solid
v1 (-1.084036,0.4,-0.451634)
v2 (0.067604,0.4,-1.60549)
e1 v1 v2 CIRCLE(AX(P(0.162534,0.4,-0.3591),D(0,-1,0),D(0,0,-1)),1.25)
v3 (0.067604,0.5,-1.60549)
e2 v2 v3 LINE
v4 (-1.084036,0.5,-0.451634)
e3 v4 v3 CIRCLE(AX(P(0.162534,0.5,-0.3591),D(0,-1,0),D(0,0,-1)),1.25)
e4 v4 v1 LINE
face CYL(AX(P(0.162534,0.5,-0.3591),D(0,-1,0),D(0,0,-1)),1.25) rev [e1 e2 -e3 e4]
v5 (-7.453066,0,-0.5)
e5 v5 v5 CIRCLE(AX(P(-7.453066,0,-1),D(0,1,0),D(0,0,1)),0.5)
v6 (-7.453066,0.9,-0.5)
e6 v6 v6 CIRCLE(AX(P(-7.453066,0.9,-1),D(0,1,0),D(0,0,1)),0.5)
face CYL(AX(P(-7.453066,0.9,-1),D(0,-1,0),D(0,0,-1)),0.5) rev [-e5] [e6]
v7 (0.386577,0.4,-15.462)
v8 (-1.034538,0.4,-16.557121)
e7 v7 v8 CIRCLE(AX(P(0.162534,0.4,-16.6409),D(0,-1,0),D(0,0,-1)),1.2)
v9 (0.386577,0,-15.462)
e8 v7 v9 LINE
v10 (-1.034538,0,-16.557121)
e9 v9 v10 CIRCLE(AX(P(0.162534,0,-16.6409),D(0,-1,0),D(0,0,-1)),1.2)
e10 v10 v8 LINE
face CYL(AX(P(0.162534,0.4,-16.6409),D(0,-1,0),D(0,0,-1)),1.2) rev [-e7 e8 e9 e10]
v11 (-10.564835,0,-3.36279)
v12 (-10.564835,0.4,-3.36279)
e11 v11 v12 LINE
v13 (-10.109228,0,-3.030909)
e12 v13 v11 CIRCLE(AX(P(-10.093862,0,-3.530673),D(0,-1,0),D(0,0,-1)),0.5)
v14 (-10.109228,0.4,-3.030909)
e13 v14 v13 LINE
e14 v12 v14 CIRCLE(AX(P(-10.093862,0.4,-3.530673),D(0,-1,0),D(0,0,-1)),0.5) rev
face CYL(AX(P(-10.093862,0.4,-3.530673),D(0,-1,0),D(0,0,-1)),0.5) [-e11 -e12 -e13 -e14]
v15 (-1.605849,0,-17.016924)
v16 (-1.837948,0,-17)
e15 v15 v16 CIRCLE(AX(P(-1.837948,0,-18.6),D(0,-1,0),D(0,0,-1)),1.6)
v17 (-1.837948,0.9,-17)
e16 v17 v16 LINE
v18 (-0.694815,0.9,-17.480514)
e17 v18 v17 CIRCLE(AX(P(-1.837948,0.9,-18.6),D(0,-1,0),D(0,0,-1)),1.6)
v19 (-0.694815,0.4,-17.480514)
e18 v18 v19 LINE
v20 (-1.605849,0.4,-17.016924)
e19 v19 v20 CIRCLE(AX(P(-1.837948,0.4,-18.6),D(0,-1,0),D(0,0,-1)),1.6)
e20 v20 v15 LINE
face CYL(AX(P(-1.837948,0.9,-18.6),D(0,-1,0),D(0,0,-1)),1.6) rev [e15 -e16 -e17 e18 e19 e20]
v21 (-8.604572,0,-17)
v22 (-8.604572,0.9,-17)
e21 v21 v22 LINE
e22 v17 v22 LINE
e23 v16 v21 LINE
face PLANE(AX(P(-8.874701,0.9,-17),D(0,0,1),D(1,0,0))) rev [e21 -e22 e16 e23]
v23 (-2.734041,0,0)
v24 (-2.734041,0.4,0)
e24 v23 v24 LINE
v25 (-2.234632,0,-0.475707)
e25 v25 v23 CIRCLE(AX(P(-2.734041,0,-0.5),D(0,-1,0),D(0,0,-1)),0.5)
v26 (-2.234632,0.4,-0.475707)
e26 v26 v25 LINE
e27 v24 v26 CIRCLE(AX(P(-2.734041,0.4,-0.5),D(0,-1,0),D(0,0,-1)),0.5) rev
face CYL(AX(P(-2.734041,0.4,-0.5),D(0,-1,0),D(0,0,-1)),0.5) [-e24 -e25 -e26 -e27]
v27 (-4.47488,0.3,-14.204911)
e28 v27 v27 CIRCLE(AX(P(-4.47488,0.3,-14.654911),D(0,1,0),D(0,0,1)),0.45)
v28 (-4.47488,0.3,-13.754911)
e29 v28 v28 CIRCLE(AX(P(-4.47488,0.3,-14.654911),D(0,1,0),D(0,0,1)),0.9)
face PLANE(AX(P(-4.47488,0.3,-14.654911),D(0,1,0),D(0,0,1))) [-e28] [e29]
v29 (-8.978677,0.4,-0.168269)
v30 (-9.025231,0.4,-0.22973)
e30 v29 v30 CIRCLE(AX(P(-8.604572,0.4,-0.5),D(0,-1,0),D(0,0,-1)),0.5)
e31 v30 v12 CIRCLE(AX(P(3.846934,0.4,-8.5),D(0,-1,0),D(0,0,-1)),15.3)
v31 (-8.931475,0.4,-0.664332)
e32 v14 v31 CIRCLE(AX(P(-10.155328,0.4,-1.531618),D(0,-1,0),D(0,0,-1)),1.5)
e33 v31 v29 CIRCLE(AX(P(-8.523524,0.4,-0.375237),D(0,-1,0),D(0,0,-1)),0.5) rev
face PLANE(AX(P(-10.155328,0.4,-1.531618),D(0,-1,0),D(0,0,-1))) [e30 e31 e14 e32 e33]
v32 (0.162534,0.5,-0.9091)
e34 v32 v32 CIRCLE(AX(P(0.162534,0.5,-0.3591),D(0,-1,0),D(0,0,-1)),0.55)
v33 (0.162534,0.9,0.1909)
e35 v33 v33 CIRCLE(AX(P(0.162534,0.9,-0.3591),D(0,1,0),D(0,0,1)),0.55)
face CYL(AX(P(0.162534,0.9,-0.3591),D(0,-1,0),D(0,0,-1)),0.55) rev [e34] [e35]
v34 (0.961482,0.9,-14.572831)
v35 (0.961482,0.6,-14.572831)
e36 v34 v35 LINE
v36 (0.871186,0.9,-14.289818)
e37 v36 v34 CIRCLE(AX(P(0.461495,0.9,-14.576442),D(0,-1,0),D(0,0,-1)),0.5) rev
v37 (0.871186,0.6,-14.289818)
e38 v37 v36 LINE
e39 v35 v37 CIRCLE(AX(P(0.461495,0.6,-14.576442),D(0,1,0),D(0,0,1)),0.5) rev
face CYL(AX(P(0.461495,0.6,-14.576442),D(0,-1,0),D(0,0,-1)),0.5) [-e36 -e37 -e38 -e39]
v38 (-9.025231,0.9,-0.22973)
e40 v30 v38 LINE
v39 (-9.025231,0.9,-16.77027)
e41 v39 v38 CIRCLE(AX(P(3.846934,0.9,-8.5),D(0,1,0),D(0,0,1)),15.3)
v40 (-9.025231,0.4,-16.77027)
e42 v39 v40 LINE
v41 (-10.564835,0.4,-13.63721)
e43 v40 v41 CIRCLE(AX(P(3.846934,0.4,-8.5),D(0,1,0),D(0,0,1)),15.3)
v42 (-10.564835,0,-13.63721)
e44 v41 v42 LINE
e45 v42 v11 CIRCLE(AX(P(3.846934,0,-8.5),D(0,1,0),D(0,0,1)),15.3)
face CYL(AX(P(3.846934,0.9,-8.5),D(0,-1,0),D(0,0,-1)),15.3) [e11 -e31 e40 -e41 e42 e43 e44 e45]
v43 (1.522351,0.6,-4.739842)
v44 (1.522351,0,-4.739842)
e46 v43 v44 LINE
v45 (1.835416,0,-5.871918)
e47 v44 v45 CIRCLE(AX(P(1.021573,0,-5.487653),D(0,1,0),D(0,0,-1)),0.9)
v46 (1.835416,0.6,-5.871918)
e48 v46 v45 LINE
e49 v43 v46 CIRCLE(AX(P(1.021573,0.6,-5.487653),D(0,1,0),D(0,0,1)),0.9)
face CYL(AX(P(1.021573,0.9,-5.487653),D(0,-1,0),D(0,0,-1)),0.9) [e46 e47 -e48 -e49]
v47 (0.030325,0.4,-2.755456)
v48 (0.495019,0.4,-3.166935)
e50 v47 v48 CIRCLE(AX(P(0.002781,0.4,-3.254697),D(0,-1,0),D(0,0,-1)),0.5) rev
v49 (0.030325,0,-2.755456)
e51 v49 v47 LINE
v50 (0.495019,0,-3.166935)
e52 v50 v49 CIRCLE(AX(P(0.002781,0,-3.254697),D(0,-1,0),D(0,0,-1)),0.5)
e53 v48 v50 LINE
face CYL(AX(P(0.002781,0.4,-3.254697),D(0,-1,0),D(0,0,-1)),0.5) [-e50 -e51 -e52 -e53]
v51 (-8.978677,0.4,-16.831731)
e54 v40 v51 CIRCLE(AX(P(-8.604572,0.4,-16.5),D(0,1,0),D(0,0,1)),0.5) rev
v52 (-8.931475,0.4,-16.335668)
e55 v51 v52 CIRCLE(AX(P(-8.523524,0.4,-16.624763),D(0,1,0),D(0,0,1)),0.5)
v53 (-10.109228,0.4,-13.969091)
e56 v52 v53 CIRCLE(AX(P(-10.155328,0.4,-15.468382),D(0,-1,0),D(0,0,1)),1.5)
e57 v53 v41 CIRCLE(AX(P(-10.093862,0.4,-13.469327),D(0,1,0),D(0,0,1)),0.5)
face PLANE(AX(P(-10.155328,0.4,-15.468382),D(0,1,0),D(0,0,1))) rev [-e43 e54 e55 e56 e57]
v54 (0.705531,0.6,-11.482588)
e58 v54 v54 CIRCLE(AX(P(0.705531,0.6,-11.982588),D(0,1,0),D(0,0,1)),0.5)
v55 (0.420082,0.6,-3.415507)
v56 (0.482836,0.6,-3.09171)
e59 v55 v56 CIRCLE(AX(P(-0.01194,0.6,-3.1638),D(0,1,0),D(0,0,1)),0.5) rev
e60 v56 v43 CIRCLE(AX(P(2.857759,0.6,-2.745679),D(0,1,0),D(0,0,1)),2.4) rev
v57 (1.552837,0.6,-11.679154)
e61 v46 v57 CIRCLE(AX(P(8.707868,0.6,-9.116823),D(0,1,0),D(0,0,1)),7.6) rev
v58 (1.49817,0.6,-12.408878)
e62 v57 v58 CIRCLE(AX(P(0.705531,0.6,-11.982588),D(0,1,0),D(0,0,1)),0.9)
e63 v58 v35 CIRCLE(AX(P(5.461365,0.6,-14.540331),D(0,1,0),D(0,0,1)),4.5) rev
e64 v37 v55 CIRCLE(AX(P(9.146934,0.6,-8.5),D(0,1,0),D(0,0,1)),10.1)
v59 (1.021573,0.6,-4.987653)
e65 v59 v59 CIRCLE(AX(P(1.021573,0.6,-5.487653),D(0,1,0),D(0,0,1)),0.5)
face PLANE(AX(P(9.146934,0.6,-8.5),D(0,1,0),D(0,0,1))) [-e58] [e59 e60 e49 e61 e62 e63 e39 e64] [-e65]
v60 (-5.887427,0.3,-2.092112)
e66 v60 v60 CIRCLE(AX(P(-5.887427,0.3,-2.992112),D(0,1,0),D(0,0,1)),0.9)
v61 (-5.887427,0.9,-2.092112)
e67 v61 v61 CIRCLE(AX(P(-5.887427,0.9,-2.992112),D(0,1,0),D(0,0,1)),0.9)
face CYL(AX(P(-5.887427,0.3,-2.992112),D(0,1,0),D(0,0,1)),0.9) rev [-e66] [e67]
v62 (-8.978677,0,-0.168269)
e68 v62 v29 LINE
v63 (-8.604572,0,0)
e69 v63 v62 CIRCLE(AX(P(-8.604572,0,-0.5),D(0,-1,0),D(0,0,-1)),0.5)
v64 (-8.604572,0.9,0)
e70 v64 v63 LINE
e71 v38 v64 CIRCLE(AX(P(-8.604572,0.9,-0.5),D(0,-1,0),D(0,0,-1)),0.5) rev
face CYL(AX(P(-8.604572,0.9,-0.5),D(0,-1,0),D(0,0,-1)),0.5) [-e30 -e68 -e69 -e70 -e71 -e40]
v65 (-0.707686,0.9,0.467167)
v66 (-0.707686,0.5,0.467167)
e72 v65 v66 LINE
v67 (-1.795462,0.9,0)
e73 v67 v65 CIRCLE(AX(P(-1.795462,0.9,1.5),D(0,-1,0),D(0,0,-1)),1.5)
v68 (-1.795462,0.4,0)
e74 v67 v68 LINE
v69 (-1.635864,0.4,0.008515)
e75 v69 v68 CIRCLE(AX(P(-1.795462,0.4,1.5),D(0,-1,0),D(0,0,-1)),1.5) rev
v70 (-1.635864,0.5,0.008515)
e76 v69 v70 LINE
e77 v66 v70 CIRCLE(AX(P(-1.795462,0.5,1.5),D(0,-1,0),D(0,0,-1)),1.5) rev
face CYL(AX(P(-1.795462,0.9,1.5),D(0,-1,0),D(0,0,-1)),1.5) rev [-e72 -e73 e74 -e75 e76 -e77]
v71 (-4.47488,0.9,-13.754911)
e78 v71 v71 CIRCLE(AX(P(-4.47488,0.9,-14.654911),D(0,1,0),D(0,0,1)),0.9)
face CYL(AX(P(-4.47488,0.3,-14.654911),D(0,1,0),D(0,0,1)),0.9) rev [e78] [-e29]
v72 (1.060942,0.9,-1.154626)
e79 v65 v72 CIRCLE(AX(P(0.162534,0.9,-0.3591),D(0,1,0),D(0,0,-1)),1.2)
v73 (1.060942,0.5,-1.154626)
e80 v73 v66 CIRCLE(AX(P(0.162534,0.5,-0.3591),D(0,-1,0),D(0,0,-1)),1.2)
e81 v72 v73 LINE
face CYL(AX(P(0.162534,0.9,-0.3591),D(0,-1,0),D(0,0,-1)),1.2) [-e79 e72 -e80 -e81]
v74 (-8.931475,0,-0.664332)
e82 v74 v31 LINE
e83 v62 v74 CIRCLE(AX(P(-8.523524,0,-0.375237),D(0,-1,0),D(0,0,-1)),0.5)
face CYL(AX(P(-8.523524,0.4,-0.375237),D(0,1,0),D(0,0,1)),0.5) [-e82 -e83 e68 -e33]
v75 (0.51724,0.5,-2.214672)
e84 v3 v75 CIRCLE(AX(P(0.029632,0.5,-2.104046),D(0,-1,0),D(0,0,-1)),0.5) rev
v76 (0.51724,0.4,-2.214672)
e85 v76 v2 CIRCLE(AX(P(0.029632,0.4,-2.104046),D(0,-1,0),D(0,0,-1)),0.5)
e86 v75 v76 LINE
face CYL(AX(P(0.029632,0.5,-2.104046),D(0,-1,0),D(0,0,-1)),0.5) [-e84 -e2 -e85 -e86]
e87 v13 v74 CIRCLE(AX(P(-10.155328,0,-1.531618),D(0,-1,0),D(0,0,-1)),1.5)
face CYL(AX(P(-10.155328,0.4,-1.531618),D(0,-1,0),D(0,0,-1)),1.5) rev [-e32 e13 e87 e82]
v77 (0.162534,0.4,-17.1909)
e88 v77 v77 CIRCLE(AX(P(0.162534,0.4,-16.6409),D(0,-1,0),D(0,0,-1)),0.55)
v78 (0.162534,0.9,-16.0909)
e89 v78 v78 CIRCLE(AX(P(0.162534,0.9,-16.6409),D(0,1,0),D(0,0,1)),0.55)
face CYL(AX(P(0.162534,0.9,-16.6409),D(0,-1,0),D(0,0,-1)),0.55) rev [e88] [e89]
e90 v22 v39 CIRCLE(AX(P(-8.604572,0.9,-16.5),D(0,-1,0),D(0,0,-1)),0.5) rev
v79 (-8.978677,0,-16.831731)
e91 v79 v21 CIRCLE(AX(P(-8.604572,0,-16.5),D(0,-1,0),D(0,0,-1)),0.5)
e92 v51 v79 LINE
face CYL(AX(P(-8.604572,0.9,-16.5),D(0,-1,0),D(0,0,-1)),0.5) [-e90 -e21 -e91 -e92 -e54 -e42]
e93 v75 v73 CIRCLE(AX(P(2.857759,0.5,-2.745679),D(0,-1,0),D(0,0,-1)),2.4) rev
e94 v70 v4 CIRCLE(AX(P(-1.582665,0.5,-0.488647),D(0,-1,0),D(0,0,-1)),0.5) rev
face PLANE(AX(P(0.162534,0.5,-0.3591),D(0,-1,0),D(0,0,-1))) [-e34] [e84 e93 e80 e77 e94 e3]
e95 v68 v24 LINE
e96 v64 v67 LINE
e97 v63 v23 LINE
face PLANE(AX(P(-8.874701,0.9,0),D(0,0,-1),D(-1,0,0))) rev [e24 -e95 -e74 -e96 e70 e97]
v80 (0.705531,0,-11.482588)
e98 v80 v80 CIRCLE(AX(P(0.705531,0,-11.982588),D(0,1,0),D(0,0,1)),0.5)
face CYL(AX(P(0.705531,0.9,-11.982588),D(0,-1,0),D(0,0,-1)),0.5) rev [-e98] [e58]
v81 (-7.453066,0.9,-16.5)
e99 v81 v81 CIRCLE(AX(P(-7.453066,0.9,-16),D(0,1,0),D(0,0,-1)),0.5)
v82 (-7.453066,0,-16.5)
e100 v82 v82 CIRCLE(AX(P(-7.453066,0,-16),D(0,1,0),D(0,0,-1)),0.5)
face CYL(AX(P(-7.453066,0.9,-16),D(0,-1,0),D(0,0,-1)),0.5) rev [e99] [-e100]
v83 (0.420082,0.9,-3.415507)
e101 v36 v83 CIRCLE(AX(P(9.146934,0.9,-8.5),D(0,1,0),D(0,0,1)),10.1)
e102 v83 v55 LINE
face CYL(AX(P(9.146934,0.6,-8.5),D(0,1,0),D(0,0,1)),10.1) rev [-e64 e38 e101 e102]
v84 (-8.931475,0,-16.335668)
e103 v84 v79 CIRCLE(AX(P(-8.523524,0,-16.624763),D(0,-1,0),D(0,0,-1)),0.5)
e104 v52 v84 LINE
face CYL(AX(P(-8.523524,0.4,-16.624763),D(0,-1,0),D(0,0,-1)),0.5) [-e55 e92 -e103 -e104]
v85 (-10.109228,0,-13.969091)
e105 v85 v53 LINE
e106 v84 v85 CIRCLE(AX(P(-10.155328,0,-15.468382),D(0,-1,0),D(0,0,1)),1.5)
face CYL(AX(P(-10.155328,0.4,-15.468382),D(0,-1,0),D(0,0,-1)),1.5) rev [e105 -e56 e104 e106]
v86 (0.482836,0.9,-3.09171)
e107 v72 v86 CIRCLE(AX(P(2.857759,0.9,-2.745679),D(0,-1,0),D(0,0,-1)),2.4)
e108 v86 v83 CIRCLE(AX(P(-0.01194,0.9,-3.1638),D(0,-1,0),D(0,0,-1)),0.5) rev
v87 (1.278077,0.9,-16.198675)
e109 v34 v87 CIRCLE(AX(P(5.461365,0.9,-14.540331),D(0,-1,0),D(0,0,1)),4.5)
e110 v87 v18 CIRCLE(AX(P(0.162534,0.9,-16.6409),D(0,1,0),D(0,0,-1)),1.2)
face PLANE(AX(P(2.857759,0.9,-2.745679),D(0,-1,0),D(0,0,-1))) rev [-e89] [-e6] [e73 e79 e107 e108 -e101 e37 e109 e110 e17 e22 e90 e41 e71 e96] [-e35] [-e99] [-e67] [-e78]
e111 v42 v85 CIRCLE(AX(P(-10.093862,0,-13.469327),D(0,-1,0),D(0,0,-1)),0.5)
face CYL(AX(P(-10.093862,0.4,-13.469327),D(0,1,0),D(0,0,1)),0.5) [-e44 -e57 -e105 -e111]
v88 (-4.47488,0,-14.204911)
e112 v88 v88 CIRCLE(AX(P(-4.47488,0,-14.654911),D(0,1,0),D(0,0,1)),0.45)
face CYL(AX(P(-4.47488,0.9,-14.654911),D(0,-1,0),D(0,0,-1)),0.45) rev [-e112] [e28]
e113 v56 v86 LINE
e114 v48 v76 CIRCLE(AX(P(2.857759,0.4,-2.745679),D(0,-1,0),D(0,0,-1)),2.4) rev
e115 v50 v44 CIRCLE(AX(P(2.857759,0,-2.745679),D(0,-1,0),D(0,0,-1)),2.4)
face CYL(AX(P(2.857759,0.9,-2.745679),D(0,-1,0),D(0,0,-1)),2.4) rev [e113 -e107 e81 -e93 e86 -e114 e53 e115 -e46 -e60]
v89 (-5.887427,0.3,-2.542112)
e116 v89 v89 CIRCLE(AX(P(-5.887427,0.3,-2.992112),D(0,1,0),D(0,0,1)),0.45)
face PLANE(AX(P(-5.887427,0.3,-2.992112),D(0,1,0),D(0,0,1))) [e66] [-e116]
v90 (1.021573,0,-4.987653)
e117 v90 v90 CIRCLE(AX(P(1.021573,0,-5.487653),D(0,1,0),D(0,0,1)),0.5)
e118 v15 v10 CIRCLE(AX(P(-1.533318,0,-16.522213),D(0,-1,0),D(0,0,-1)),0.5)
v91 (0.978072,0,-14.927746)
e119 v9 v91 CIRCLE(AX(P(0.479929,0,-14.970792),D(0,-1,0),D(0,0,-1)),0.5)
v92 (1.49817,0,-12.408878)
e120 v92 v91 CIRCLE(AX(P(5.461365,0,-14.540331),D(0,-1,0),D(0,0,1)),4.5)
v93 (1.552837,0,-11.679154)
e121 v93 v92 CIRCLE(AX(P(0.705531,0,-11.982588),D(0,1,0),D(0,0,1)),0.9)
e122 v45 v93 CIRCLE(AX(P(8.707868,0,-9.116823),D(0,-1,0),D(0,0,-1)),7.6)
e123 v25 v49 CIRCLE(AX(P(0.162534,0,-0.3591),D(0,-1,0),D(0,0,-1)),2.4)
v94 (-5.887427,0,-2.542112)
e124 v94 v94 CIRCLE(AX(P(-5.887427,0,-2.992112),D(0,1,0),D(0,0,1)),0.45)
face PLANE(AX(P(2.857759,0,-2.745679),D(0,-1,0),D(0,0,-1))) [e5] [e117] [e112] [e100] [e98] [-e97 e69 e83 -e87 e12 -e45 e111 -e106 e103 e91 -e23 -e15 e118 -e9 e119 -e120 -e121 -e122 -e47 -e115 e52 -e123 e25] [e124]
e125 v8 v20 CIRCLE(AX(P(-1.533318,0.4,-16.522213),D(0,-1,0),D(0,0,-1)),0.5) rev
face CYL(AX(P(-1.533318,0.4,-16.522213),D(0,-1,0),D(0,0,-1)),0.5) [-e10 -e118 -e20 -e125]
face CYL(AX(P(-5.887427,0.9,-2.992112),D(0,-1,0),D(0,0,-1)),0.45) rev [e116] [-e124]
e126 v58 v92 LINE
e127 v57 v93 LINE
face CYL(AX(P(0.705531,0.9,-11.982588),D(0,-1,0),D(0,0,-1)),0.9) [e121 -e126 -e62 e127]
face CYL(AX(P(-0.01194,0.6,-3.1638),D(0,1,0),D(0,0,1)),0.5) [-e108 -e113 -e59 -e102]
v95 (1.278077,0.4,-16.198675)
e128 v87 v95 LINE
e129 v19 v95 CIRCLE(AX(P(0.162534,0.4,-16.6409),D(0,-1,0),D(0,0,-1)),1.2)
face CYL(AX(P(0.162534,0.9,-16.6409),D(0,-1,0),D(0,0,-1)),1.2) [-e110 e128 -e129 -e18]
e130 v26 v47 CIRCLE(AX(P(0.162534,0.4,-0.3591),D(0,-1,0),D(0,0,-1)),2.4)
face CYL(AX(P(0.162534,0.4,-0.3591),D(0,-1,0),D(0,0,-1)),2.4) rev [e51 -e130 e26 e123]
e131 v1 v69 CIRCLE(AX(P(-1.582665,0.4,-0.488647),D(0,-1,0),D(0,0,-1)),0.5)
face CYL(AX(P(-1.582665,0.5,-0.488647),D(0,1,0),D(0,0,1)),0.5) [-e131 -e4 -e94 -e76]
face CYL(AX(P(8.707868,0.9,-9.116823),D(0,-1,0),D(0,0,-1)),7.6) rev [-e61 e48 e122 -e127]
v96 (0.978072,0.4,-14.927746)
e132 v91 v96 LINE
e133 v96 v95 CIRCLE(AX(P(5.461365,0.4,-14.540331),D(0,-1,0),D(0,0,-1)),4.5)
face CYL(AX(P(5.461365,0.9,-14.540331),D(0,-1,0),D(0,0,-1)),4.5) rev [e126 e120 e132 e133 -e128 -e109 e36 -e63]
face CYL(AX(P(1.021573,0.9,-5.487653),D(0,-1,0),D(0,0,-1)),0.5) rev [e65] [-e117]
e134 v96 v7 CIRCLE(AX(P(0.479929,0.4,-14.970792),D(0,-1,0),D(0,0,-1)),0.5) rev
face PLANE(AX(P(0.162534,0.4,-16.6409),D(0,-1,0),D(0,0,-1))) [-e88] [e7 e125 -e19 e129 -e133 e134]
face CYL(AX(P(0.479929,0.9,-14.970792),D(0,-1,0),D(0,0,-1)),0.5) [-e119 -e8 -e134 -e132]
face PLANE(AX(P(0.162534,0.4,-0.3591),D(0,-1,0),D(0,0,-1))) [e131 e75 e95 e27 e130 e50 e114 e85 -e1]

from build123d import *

# Parameters (mm, degrees)
SKETCH_1_R          = 0.5
SKETCH_1_R_2        = 0.55
SKETCH_1_R_3        = 0.45
EXTRUDE_1_DEPTH     = 0.9
SKETCH_2_R          = 10.1
CUT_EXTRUDE_1_DEPTH = 0.3
SKETCH_3_R          = 2.4
SKETCH_3_R_2        = 1.5
CUT_EXTRUDE_2_DEPTH = 0.4
SKETCH_4_R          = 1.25
CUT_EXTRUDE_3_DEPTH = 0.1
SKETCH_5_R          = 0.9
CUT_EXTRUDE_4_DEPTH = 0.6
SKETCH_6_R          = 1.2
CUT_EXTRUDE_5_DEPTH = 0.4
FILLET_START        = -1
FILLET_1_DEPTH      = 1.4
FILLET_START_2      = 0.4
FILLET_1_2_DEPTH    = 0.1
FILLET_START_3      = 0.5
FILLET_1_3_DEPTH    = 1.5
FILLET_START_4      = 0.6
FILLET_1_4_DEPTH    = 1.4


with BuildPart() as part:
    # Эскиз1 → Бобышка-Вытянуть1 (new body)
    with BuildSketch(Plane(origin=(0, 0, 0), x_dir=(1, 0, 0), z_dir=(0, 1, 0))):
        with BuildLine():
            Line((-8.874701271, 0), (-1.795461863, 0))
            ThreePointArc((-1.795461863, 0), (-1.203537037, -0.121731158), (-0.70768647, -0.467166667))
            ThreePointArc((-0.70768647, -0.467166667), (0.973552797, -0.525347996), (1.060942394, 1.154626289))
            ThreePointArc((1.060942394, 1.154626289), (0.477391661, 3.052026669), (1.522351258, 4.739841558))
            ThreePointArc((1.522351258, 4.739841558), (1.889015496, 5.247769663), (1.835416111, 5.871917665))
            ThreePointArc((1.835416111, 5.871917665), (1.116849218, 8.747445681), (1.55283729, 11.679154083))
            ThreePointArc((1.55283729, 11.679154083), (1.603016133, 12.049823116), (1.498169999, 12.408878456))
            ThreePointArc((1.498169999, 12.408878456), (0.968934134, 14.279432184), (1.278077174, 16.198674855))
            ThreePointArc((1.278077174, 16.198674855), (0.816325951, 17.647158357), (-0.694815473, 17.480514286))
            ThreePointArc((-0.694815473, 17.480514286), (-1.217938679, 17.125012349), (-1.837947895, 17))
            Line((-1.837947895, 17), (-8.874701271, 17))
            ThreePointArc((-8.874701271, 17), (-11.453066156, 8.5), (-8.874701271, 0))
        make_face()
        with Locations(Location((1.021573168, 5.487652568, 0), (0, 0, 270))):
            Circle(SKETCH_1_R, mode=Mode.SUBTRACT)
        with Locations(Location((0.162533844, 0.3591, 0), (0, 0, 270))):
            Circle(SKETCH_1_R_2, mode=Mode.SUBTRACT)
        with Locations(Location((-5.887426867, 2.992111817, 0), (0, 0, 270))):
            Circle(SKETCH_1_R_3, mode=Mode.SUBTRACT)
        with Locations(Location((-7.453066156, 1, 0), (0, 0, 270))):
            Circle(SKETCH_1_R, mode=Mode.SUBTRACT)
        with Locations(Location((-4.474879967, 14.65491132, 0), (0, 0, 270))):
            Circle(SKETCH_1_R_3, mode=Mode.SUBTRACT)
        with Locations(Location((-7.453066156, 16, 0), (0, 0, 90))):
            Circle(SKETCH_1_R, mode=Mode.SUBTRACT)
        with Locations(Location((0.705531067, 11.982588035, 0), (0, 0, 270))):
            Circle(SKETCH_1_R, mode=Mode.SUBTRACT)
        with Locations(Location((0.162533844, 16.6409, 0), (0, 0, 270))):
            Circle(SKETCH_1_R_2, mode=Mode.SUBTRACT)
    extrude(amount=EXTRUDE_1_DEPTH)

    # Эскиз2 → Вырез-Вытянуть1 (cut)
    with BuildSketch(Plane(origin=(0, 0.9, 0), x_dir=(1, 0, 0), z_dir=(0, 1, 0))):
        with Locations((9.146933844, 8.5)):
            Circle(SKETCH_2_R)
    extrude(amount=-CUT_EXTRUDE_1_DEPTH, mode=Mode.SUBTRACT)

    # Эскиз3 → Вырез-Вытянуть2 (cut)
    with BuildSketch(Plane.XZ):
        with Locations((0.162533844, -0.3591)):
            Circle(SKETCH_3_R)
        with Locations((-10.155327835, -1.531617514)):
            Circle(SKETCH_3_R_2)
        with Locations((-10.155327835, -15.468382486)):
            Circle(SKETCH_3_R_2)
    extrude(amount=-CUT_EXTRUDE_2_DEPTH, mode=Mode.SUBTRACT)

    # Эскиз4 → Вырез-Вытянуть3 (cut)
    with BuildSketch(Plane.XZ.offset(-0.4)):
        with Locations((0.162533844, -0.3591)):
            Circle(SKETCH_4_R)
    extrude(amount=-CUT_EXTRUDE_3_DEPTH, mode=Mode.SUBTRACT)

    # Эскиз5 → Вырез-Вытянуть4 (cut)
    with BuildSketch(Plane(origin=(0, 0.9, 0), x_dir=(1, 0, 0), z_dir=(0, 1, 0))):
        with Locations(Location((-5.887426867, 2.992111817, 0), (0, 0, 270))):
            Circle(SKETCH_5_R)
        with Locations(Location((-4.474879967, 14.65491132, 0), (0, 0, 270))):
            Circle(SKETCH_5_R)
    extrude(amount=-CUT_EXTRUDE_4_DEPTH, mode=Mode.SUBTRACT)

    # Эскиз6 → Вырез-Вытянуть5 (cut)
    with BuildSketch(Plane.XZ):
        with Locations((0.162533844, -16.6409)):
            Circle(SKETCH_6_R)
    extrude(amount=-CUT_EXTRUDE_5_DEPTH, mode=Mode.SUBTRACT)

    # Скругление1: read off the stored shape, not the designer's step
    # Скругление1 outline → Скругление1 (cut)
    with BuildSketch(Plane(origin=(0, 0, 0), x_dir=(1, 0, 0), z_dir=(0, 1, 0)).offset(FILLET_START)):
        with BuildLine():
            ThreePointArc((-10.564834765, 13.6372099), (-10.388255808, 13.873471068), (-10.10922841, 13.969091039))
            ThreePointArc((-10.10922841, 13.969091039), (-10.271568069, 13.972893199), (-10.432545463, 13.994221577))
            ThreePointArc((-10.432545463, 13.994221577), (-10.499800665, 13.816127249), (-10.564834765, 13.6372099))
        make_face()
        with BuildLine():
            ThreePointArc((-9.146480388, 16.578439614), (-9.032397619, 16.462881218), (-8.931474904, 16.335667907))
            ThreePointArc((-8.931474904, 16.335667907), (-9.021275661, 16.577400508), (-8.978676793, 16.831731322))
            ThreePointArc((-8.978676793, 16.831731322), (-8.809674916, 16.955996525), (-8.604572089, 17))
            Line((-8.604572089, 17), (-8.874701271, 17))
            ThreePointArc((-8.874701271, 17), (-8.950481675, 16.885472917), (-9.025231073, 16.77027027))
            ThreePointArc((-9.025231073, 16.77027027), (-9.086211401, 16.674579749), (-9.146480388, 16.578439614))
        make_face()
        with BuildLine():
            ThreePointArc((-10.10922841, 3.030908961), (-10.388255808, 3.126528932), (-10.564834765, 3.3627901))
            ThreePointArc((-10.564834765, 3.3627901), (-10.499800665, 3.183872751), (-10.432545462, 3.005778423))
            ThreePointArc((-10.432545462, 3.005778423), (-10.271568069, 3.027106801), (-10.10922841, 3.030908961))
        make_face()
        with BuildLine():
            ThreePointArc((-8.978676793, 0.168268678), (-9.021275661, 0.422599492), (-8.931474903, 0.664332093))
            ThreePointArc((-8.931474903, 0.664332093), (-9.032397619, 0.537118782), (-9.146480388, 0.421560386))
            ThreePointArc((-9.146480388, 0.421560386), (-9.086211401, 0.325420251), (-9.025231073, 0.22972973))
            ThreePointArc((-9.025231073, 0.22972973), (-8.950481675, 0.114527083), (-8.874701271, 0))
            Line((-8.874701271, 0), (-8.604572089, 0))
            ThreePointArc((-8.604572089, 0), (-8.809674916, 0.044003475), (-8.978676793, 0.168268678))
        make_face()
        with BuildLine():
            ThreePointArc((-0.694815473, 17.480514286), (-1.112314109, 17.17400715), (-1.605848887, 17.016923865))
            ThreePointArc((-1.605848887, 17.016923865), (-1.219826633, 16.911729191), (-1.034538008, 16.557120639))
            ThreePointArc((-1.034538008, 16.557120639), (-0.963665757, 17.055236166), (-0.694815473, 17.480514286))
        make_face()
        with BuildLine():
            ThreePointArc((-2.234631739, 0.475706897), (-2.389183693, 0.137959566), (-2.734041235, 0))
            Line((-2.734041235, 0), (-2.210448918, 0))
            ThreePointArc((-2.210448918, 0), (-2.23437105, 0.237252027), (-2.234631739, 0.475706897))
        make_face()
        with BuildLine():
            ThreePointArc((1.278077174, 16.198674855), (0.926926141, 15.715857074), (0.386577368, 15.462000301))
            ThreePointArc((0.386577368, 15.462000301), (0.815072231, 15.341843176), (0.978072419, 14.92774594))
            ThreePointArc((0.978072419, 14.92774594), (1.081728132, 15.5741506), (1.278077174, 16.198674855))
        make_face()
        with BuildLine():
            ThreePointArc((0.030324762, 2.755455725), (0.244370036, 2.757704352), (0.457764308, 2.740872234))
            ThreePointArc((0.457764308, 2.740872234), (0.466881934, 2.954735051), (0.495018839, 3.16693484))
            ThreePointArc((0.495018839, 3.16693484), (0.33425049, 2.880359605), (0.030324762, 2.755455725))
        make_face()
    extrude(amount=FILLET_1_DEPTH, mode=Mode.SUBTRACT)

    # Fillet 1 2 outline → Fillet 1 2 (cut)
    with BuildSketch(Plane(origin=(0, 0, 0), x_dir=(1, 0, 0), z_dir=(0, 1, 0)).offset(FILLET_START_2)):
        with BuildLine():
            ThreePointArc((-9.025231073, 16.77027027), (-8.844222736, 16.938825213), (-8.604572089, 17))
            Line((-8.604572089, 17), (-8.874701271, 17))
            ThreePointArc((-8.874701271, 17), (-8.950481675, 16.885472917), (-9.025231073, 16.77027027))
        make_face()
        with BuildLine():
            ThreePointArc((-8.604572089, 0), (-8.844222736, 0.061174787), (-9.025231073, 0.22972973))
            ThreePointArc((-9.025231073, 0.22972973), (-8.950481675, 0.114527083), (-8.874701271, 0))
            Line((-8.874701271, 0), (-8.604572089, 0))
        make_face()
        with BuildLine():
            ThreePointArc((-1.08403646, 0.451633648), (-1.262452429, 0.10463646), (-1.635863903, -0.00851467))
            ThreePointArc((-1.635863903, -0.00851467), (-1.25040696, -0.102532593), (-0.903083615, -0.294321327))
            ThreePointArc((-0.903083615, -0.294321327), (-1.052235792, 0.064422668), (-1.08403646, 0.451633648))
        make_face()
        with BuildLine():
            ThreePointArc((0.884565826, 1.379477291), (0.660848396, 1.77945859), (0.517239852, 2.214672463))
            ThreePointArc((0.517239852, 2.214672463), (0.431918135, 1.807119305), (0.067603665, 1.605490092))
            ThreePointArc((0.067603665, 1.605490092), (0.49582743, 1.563847021), (0.884565826, 1.379477291))
        make_face()
    extrude(amount=FILLET_1_2_DEPTH, mode=Mode.SUBTRACT)

    # Fillet 1 3 outline → Fillet 1 3 (cut)
    with BuildSketch(Plane(origin=(0, 0, 0), x_dir=(1, 0, 0), z_dir=(0, 1, 0)).offset(FILLET_START_3)):
        with BuildLine():
            ThreePointArc((-9.025231073, 16.77027027), (-8.844222736, 16.938825213), (-8.604572089, 17))
            Line((-8.604572089, 17), (-8.874701271, 17))
            ThreePointArc((-8.874701271, 17), (-8.950481675, 16.885472917), (-9.025231073, 16.77027027))
        make_face()
        with BuildLine():
            ThreePointArc((-8.604572089, 0), (-8.844222736, 0.061174787), (-9.025231073, 0.22972973))
            ThreePointArc((-9.025231073, 0.22972973), (-8.950481675, 0.114527083), (-8.874701271, 0))
            Line((-8.874701271, 0), (-8.604572089, 0))
        make_face()
    extrude(amount=FILLET_1_3_DEPTH, mode=Mode.SUBTRACT)

    # Fillet 1 4 outline → Fillet 1 4 (cut)
    with BuildSketch(Plane(origin=(0, 0, 0), x_dir=(1, 0, 0), z_dir=(0, 1, 0)).offset(FILLET_START_4)):
        with BuildLine():
            ThreePointArc((0.963003545, 14.4188922), (0.96158445, 14.49585524), (0.961482029, 14.572831294))
            ThreePointArc((0.961482029, 14.572831294), (0.937837832, 14.424463631), (0.871185578, 14.289817841))
            ThreePointArc((0.871185578, 14.289817841), (0.916841519, 14.354535024), (0.963003545, 14.4188922))
        make_face()
        with BuildLine():
            ThreePointArc((0.42008242, 3.415507477), (0.478926522, 3.25893209), (0.482835834, 3.091710089))
            ThreePointArc((0.482835834, 3.091710089), (0.496570271, 3.175545649), (0.513263178, 3.258842605))
            ThreePointArc((0.513263178, 3.258842605), (0.466319363, 3.336964825), (0.42008242, 3.415507477))
        make_face()
    extrude(amount=FILLET_1_4_DEPTH, mode=Mode.SUBTRACT)


solid = part.part
